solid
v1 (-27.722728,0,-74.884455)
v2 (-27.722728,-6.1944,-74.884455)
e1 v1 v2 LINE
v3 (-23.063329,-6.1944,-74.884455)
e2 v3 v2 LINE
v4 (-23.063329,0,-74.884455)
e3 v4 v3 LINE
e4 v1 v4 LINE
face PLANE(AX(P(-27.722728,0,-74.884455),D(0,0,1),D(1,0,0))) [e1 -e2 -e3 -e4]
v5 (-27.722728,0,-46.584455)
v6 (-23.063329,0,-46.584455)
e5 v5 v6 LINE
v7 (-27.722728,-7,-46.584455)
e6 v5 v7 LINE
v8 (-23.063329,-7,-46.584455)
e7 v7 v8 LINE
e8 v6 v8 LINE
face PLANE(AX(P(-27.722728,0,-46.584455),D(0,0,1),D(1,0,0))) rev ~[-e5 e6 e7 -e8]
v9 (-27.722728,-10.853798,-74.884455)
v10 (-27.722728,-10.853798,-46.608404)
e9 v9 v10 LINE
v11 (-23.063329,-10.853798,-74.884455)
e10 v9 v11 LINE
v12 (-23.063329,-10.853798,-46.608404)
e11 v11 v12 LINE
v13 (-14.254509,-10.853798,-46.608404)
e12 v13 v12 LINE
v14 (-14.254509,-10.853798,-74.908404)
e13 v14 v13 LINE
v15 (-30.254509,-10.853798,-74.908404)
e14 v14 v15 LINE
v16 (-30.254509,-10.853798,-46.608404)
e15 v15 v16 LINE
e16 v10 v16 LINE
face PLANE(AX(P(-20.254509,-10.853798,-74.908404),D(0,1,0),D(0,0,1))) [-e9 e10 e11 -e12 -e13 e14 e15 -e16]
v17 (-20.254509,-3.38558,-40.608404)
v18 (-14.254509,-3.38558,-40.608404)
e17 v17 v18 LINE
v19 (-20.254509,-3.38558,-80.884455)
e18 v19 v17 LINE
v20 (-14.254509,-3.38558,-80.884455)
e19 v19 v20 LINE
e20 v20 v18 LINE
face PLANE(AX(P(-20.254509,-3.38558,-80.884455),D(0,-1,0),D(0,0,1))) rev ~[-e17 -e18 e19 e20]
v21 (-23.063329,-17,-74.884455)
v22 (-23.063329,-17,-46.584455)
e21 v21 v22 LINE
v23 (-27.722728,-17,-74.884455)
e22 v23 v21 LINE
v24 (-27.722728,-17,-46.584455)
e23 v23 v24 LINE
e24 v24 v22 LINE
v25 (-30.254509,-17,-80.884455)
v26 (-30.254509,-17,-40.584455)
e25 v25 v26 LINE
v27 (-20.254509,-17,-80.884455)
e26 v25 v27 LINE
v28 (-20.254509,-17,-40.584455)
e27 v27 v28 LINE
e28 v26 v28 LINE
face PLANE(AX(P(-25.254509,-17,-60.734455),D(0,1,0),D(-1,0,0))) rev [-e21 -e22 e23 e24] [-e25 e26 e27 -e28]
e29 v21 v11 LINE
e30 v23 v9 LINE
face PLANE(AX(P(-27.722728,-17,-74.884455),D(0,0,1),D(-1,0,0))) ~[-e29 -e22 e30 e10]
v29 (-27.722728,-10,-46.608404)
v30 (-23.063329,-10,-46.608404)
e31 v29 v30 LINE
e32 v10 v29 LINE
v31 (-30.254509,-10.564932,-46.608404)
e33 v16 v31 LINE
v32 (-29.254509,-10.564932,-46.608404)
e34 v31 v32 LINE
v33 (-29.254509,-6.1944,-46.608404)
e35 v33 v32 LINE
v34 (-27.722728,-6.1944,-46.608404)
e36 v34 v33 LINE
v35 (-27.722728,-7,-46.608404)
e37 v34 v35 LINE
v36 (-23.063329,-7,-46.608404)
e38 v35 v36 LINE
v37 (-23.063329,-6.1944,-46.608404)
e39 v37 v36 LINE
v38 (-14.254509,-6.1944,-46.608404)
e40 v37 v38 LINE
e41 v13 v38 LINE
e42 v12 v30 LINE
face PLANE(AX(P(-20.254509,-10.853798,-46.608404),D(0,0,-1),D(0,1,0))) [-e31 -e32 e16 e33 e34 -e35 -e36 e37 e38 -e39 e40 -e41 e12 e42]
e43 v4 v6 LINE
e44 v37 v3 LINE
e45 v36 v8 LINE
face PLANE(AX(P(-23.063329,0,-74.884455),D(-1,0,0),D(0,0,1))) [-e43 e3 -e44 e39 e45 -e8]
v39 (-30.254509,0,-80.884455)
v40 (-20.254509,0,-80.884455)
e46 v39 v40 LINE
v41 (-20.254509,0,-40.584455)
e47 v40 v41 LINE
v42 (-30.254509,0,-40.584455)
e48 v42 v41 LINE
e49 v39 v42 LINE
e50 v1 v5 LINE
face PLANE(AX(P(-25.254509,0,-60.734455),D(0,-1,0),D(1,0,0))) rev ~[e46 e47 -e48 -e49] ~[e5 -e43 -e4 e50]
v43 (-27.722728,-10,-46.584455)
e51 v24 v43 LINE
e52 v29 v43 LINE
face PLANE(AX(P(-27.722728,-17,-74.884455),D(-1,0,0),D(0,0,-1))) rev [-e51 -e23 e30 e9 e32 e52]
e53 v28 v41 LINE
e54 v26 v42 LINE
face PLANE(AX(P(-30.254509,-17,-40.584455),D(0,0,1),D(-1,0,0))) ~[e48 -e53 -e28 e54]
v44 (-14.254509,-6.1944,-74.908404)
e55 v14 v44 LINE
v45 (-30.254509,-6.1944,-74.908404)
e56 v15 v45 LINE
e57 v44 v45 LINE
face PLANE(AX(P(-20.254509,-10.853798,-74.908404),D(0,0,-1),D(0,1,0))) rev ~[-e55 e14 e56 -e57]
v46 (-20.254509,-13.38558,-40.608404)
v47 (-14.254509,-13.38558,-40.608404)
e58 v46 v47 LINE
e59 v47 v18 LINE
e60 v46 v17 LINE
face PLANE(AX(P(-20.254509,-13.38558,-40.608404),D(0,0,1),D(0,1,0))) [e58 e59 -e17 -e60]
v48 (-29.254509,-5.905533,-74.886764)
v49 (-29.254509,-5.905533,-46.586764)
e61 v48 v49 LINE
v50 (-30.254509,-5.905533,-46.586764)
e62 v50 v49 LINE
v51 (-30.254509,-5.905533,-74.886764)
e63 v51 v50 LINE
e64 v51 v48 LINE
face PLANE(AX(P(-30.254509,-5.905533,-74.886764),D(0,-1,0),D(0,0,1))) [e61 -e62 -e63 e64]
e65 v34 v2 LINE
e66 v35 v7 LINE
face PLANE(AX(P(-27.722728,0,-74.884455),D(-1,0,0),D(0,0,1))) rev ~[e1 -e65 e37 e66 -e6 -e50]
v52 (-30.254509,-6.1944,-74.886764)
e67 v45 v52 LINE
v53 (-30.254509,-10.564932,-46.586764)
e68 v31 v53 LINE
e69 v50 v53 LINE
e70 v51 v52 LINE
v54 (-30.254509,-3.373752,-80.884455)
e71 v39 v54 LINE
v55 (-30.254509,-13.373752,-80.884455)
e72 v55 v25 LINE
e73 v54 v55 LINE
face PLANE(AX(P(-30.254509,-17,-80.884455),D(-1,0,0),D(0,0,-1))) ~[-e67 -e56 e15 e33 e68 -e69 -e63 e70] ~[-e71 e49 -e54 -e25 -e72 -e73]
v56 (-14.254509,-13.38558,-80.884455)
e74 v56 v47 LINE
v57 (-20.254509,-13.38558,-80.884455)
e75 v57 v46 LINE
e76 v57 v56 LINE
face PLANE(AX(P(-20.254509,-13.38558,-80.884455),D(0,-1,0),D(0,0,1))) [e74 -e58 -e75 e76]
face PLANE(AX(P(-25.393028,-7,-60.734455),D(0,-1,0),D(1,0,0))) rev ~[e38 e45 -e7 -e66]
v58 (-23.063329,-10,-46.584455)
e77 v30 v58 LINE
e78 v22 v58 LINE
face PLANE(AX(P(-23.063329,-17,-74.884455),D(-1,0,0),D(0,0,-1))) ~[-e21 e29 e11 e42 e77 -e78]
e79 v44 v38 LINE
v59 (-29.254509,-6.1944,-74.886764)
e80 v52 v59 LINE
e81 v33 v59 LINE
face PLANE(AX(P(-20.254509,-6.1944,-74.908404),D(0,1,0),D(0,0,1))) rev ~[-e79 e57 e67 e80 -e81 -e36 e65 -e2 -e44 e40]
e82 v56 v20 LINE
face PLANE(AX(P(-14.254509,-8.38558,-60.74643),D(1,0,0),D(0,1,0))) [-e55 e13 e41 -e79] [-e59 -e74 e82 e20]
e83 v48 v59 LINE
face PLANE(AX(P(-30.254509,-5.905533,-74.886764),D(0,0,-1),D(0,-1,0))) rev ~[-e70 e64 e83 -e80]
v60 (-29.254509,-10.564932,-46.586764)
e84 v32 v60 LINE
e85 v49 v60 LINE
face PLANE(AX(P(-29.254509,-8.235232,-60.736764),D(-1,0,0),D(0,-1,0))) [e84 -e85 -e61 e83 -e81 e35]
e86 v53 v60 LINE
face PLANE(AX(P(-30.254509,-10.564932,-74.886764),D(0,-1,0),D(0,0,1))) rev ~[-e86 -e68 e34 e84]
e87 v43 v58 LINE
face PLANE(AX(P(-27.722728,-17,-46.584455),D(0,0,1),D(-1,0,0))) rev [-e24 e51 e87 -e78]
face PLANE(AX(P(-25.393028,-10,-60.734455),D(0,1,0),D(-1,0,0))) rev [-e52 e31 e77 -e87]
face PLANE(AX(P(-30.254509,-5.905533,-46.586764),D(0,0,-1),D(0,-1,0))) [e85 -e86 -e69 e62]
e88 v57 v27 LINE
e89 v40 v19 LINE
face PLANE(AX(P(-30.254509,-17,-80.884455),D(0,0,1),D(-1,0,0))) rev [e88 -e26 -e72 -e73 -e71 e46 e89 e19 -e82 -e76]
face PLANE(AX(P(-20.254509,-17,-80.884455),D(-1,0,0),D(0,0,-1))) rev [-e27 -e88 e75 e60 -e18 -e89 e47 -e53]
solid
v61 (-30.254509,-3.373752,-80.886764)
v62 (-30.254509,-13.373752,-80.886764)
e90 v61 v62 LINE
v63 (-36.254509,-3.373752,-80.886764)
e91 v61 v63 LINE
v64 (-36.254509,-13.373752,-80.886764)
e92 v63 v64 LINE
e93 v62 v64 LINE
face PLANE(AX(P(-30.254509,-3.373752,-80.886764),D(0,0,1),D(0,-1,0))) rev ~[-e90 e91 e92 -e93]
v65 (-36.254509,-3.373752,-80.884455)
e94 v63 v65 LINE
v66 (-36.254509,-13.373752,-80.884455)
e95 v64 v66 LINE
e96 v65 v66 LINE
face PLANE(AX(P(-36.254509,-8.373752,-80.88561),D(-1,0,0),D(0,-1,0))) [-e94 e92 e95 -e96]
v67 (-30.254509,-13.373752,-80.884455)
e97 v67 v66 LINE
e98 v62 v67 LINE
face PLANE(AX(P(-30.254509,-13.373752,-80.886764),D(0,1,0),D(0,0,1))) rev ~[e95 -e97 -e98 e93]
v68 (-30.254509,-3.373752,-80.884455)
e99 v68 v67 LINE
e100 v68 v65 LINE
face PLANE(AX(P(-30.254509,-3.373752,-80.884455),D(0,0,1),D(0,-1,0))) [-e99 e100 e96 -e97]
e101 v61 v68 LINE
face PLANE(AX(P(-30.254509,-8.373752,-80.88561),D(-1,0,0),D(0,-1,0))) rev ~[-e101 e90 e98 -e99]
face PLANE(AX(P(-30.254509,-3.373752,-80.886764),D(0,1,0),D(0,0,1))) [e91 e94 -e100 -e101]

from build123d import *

# Parameters (mm, degrees)
F0_W     = 10
F0_H     = 40.3
F0_W_2   = 4.6593984449
F0_H_2   = 28.3
F1_DEPTH = 8.5
F2_DEPTH = 7
F4_W     = 10
F4_H     = 0.0023088843
F5_DEPTH = 6
F4_W_2   = 4.6593984449
F4_H_2   = 28.3
F6_DEPTH = 1
F7_W     = 10
F7_H     = 40.2760509044
F7_W_2   = 4.6593984449
F7_H_2   = 28.3
F8_DEPTH = 6
F9_DEPTH = 25.4


# Not quite as in the source:
# - a feature names something its author has since deleted; it is built from what else it names


with BuildPart() as f1:
    # F0 (on Front) → F1 (new body)
    with BuildSketch(Plane.XZ):
        with Locations((-25.2545091997, -60.7344553381)):
            Rectangle(F0_W, F0_H)
        with Locations((-25.3930282849, -60.7344553381)):
            Rectangle(F0_W_2, F0_H_2, mode=Mode.SUBTRACT)
        with Locations((-25.3930282849, -60.7344553381)):
            Rectangle(F0_W_2, F0_H_2)
    extrude(amount=F1_DEPTH)

    # F0 (on Front) → F2 (cut)
    with BuildSketch(Plane.XZ):
        with Locations((-25.3930282849, -60.7344553381)):
            Rectangle(F0_W_2, F0_H_2)
    extrude(amount=F2_DEPTH, mode=Mode.SUBTRACT)

    # F3: F1 across face


with BuildPart() as f1_1:
    add(f1.part)
    add(f1.part.mirror(Plane(origin=(-25.2545091997, -8.5, -60.7344553381), x_dir=(1, 0, 0), z_dir=(0, -1, 0))))

    # F4 (on face) → F5 (join)
    with BuildSketch(Plane(origin=(-30.2545091997, 0, 0), x_dir=(0, -1, 0), z_dir=(-1, 0, 0))):
        with Locations((8.3737515296, -80.8856097803)):
            Rectangle(F4_W, F4_H)
    extrude(amount=F5_DEPTH)

    # F4 (on face) → F6 (cut)
    with BuildSketch(Plane(origin=(-30.2545091997, 0, 0), x_dir=(0, -1, 0), z_dir=(-1, 0, 0))):
        with Locations((8.2352324444, -60.7367642224)):
            Rectangle(F4_W_2, F4_H_2)
    extrude(amount=-F6_DEPTH, mode=Mode.SUBTRACT)

    # F7 (on face) → F8 (join)
    with BuildSketch(Plane.YZ.offset(-20.2545091997)):
        with Locations((-8.3855800414, -60.7464298859)):
            Rectangle(F7_W, F7_H)
        with Locations((-8.5240991265, -60.7584044337)):
            Rectangle(F7_W_2, F7_H_2, mode=Mode.SUBTRACT)
    extrude(amount=F8_DEPTH)

    # F9 (cut): a face of the model
    f9_faces = [f1_1.faces().sort_by_distance(p)[0] for p in [
        (-20.2545091997, -8.5240991265, -60.7584044337),
    ]]
    extrude(f9_faces, amount=-F9_DEPTH, mode=Mode.SUBTRACT)


solid = f1_1.part
